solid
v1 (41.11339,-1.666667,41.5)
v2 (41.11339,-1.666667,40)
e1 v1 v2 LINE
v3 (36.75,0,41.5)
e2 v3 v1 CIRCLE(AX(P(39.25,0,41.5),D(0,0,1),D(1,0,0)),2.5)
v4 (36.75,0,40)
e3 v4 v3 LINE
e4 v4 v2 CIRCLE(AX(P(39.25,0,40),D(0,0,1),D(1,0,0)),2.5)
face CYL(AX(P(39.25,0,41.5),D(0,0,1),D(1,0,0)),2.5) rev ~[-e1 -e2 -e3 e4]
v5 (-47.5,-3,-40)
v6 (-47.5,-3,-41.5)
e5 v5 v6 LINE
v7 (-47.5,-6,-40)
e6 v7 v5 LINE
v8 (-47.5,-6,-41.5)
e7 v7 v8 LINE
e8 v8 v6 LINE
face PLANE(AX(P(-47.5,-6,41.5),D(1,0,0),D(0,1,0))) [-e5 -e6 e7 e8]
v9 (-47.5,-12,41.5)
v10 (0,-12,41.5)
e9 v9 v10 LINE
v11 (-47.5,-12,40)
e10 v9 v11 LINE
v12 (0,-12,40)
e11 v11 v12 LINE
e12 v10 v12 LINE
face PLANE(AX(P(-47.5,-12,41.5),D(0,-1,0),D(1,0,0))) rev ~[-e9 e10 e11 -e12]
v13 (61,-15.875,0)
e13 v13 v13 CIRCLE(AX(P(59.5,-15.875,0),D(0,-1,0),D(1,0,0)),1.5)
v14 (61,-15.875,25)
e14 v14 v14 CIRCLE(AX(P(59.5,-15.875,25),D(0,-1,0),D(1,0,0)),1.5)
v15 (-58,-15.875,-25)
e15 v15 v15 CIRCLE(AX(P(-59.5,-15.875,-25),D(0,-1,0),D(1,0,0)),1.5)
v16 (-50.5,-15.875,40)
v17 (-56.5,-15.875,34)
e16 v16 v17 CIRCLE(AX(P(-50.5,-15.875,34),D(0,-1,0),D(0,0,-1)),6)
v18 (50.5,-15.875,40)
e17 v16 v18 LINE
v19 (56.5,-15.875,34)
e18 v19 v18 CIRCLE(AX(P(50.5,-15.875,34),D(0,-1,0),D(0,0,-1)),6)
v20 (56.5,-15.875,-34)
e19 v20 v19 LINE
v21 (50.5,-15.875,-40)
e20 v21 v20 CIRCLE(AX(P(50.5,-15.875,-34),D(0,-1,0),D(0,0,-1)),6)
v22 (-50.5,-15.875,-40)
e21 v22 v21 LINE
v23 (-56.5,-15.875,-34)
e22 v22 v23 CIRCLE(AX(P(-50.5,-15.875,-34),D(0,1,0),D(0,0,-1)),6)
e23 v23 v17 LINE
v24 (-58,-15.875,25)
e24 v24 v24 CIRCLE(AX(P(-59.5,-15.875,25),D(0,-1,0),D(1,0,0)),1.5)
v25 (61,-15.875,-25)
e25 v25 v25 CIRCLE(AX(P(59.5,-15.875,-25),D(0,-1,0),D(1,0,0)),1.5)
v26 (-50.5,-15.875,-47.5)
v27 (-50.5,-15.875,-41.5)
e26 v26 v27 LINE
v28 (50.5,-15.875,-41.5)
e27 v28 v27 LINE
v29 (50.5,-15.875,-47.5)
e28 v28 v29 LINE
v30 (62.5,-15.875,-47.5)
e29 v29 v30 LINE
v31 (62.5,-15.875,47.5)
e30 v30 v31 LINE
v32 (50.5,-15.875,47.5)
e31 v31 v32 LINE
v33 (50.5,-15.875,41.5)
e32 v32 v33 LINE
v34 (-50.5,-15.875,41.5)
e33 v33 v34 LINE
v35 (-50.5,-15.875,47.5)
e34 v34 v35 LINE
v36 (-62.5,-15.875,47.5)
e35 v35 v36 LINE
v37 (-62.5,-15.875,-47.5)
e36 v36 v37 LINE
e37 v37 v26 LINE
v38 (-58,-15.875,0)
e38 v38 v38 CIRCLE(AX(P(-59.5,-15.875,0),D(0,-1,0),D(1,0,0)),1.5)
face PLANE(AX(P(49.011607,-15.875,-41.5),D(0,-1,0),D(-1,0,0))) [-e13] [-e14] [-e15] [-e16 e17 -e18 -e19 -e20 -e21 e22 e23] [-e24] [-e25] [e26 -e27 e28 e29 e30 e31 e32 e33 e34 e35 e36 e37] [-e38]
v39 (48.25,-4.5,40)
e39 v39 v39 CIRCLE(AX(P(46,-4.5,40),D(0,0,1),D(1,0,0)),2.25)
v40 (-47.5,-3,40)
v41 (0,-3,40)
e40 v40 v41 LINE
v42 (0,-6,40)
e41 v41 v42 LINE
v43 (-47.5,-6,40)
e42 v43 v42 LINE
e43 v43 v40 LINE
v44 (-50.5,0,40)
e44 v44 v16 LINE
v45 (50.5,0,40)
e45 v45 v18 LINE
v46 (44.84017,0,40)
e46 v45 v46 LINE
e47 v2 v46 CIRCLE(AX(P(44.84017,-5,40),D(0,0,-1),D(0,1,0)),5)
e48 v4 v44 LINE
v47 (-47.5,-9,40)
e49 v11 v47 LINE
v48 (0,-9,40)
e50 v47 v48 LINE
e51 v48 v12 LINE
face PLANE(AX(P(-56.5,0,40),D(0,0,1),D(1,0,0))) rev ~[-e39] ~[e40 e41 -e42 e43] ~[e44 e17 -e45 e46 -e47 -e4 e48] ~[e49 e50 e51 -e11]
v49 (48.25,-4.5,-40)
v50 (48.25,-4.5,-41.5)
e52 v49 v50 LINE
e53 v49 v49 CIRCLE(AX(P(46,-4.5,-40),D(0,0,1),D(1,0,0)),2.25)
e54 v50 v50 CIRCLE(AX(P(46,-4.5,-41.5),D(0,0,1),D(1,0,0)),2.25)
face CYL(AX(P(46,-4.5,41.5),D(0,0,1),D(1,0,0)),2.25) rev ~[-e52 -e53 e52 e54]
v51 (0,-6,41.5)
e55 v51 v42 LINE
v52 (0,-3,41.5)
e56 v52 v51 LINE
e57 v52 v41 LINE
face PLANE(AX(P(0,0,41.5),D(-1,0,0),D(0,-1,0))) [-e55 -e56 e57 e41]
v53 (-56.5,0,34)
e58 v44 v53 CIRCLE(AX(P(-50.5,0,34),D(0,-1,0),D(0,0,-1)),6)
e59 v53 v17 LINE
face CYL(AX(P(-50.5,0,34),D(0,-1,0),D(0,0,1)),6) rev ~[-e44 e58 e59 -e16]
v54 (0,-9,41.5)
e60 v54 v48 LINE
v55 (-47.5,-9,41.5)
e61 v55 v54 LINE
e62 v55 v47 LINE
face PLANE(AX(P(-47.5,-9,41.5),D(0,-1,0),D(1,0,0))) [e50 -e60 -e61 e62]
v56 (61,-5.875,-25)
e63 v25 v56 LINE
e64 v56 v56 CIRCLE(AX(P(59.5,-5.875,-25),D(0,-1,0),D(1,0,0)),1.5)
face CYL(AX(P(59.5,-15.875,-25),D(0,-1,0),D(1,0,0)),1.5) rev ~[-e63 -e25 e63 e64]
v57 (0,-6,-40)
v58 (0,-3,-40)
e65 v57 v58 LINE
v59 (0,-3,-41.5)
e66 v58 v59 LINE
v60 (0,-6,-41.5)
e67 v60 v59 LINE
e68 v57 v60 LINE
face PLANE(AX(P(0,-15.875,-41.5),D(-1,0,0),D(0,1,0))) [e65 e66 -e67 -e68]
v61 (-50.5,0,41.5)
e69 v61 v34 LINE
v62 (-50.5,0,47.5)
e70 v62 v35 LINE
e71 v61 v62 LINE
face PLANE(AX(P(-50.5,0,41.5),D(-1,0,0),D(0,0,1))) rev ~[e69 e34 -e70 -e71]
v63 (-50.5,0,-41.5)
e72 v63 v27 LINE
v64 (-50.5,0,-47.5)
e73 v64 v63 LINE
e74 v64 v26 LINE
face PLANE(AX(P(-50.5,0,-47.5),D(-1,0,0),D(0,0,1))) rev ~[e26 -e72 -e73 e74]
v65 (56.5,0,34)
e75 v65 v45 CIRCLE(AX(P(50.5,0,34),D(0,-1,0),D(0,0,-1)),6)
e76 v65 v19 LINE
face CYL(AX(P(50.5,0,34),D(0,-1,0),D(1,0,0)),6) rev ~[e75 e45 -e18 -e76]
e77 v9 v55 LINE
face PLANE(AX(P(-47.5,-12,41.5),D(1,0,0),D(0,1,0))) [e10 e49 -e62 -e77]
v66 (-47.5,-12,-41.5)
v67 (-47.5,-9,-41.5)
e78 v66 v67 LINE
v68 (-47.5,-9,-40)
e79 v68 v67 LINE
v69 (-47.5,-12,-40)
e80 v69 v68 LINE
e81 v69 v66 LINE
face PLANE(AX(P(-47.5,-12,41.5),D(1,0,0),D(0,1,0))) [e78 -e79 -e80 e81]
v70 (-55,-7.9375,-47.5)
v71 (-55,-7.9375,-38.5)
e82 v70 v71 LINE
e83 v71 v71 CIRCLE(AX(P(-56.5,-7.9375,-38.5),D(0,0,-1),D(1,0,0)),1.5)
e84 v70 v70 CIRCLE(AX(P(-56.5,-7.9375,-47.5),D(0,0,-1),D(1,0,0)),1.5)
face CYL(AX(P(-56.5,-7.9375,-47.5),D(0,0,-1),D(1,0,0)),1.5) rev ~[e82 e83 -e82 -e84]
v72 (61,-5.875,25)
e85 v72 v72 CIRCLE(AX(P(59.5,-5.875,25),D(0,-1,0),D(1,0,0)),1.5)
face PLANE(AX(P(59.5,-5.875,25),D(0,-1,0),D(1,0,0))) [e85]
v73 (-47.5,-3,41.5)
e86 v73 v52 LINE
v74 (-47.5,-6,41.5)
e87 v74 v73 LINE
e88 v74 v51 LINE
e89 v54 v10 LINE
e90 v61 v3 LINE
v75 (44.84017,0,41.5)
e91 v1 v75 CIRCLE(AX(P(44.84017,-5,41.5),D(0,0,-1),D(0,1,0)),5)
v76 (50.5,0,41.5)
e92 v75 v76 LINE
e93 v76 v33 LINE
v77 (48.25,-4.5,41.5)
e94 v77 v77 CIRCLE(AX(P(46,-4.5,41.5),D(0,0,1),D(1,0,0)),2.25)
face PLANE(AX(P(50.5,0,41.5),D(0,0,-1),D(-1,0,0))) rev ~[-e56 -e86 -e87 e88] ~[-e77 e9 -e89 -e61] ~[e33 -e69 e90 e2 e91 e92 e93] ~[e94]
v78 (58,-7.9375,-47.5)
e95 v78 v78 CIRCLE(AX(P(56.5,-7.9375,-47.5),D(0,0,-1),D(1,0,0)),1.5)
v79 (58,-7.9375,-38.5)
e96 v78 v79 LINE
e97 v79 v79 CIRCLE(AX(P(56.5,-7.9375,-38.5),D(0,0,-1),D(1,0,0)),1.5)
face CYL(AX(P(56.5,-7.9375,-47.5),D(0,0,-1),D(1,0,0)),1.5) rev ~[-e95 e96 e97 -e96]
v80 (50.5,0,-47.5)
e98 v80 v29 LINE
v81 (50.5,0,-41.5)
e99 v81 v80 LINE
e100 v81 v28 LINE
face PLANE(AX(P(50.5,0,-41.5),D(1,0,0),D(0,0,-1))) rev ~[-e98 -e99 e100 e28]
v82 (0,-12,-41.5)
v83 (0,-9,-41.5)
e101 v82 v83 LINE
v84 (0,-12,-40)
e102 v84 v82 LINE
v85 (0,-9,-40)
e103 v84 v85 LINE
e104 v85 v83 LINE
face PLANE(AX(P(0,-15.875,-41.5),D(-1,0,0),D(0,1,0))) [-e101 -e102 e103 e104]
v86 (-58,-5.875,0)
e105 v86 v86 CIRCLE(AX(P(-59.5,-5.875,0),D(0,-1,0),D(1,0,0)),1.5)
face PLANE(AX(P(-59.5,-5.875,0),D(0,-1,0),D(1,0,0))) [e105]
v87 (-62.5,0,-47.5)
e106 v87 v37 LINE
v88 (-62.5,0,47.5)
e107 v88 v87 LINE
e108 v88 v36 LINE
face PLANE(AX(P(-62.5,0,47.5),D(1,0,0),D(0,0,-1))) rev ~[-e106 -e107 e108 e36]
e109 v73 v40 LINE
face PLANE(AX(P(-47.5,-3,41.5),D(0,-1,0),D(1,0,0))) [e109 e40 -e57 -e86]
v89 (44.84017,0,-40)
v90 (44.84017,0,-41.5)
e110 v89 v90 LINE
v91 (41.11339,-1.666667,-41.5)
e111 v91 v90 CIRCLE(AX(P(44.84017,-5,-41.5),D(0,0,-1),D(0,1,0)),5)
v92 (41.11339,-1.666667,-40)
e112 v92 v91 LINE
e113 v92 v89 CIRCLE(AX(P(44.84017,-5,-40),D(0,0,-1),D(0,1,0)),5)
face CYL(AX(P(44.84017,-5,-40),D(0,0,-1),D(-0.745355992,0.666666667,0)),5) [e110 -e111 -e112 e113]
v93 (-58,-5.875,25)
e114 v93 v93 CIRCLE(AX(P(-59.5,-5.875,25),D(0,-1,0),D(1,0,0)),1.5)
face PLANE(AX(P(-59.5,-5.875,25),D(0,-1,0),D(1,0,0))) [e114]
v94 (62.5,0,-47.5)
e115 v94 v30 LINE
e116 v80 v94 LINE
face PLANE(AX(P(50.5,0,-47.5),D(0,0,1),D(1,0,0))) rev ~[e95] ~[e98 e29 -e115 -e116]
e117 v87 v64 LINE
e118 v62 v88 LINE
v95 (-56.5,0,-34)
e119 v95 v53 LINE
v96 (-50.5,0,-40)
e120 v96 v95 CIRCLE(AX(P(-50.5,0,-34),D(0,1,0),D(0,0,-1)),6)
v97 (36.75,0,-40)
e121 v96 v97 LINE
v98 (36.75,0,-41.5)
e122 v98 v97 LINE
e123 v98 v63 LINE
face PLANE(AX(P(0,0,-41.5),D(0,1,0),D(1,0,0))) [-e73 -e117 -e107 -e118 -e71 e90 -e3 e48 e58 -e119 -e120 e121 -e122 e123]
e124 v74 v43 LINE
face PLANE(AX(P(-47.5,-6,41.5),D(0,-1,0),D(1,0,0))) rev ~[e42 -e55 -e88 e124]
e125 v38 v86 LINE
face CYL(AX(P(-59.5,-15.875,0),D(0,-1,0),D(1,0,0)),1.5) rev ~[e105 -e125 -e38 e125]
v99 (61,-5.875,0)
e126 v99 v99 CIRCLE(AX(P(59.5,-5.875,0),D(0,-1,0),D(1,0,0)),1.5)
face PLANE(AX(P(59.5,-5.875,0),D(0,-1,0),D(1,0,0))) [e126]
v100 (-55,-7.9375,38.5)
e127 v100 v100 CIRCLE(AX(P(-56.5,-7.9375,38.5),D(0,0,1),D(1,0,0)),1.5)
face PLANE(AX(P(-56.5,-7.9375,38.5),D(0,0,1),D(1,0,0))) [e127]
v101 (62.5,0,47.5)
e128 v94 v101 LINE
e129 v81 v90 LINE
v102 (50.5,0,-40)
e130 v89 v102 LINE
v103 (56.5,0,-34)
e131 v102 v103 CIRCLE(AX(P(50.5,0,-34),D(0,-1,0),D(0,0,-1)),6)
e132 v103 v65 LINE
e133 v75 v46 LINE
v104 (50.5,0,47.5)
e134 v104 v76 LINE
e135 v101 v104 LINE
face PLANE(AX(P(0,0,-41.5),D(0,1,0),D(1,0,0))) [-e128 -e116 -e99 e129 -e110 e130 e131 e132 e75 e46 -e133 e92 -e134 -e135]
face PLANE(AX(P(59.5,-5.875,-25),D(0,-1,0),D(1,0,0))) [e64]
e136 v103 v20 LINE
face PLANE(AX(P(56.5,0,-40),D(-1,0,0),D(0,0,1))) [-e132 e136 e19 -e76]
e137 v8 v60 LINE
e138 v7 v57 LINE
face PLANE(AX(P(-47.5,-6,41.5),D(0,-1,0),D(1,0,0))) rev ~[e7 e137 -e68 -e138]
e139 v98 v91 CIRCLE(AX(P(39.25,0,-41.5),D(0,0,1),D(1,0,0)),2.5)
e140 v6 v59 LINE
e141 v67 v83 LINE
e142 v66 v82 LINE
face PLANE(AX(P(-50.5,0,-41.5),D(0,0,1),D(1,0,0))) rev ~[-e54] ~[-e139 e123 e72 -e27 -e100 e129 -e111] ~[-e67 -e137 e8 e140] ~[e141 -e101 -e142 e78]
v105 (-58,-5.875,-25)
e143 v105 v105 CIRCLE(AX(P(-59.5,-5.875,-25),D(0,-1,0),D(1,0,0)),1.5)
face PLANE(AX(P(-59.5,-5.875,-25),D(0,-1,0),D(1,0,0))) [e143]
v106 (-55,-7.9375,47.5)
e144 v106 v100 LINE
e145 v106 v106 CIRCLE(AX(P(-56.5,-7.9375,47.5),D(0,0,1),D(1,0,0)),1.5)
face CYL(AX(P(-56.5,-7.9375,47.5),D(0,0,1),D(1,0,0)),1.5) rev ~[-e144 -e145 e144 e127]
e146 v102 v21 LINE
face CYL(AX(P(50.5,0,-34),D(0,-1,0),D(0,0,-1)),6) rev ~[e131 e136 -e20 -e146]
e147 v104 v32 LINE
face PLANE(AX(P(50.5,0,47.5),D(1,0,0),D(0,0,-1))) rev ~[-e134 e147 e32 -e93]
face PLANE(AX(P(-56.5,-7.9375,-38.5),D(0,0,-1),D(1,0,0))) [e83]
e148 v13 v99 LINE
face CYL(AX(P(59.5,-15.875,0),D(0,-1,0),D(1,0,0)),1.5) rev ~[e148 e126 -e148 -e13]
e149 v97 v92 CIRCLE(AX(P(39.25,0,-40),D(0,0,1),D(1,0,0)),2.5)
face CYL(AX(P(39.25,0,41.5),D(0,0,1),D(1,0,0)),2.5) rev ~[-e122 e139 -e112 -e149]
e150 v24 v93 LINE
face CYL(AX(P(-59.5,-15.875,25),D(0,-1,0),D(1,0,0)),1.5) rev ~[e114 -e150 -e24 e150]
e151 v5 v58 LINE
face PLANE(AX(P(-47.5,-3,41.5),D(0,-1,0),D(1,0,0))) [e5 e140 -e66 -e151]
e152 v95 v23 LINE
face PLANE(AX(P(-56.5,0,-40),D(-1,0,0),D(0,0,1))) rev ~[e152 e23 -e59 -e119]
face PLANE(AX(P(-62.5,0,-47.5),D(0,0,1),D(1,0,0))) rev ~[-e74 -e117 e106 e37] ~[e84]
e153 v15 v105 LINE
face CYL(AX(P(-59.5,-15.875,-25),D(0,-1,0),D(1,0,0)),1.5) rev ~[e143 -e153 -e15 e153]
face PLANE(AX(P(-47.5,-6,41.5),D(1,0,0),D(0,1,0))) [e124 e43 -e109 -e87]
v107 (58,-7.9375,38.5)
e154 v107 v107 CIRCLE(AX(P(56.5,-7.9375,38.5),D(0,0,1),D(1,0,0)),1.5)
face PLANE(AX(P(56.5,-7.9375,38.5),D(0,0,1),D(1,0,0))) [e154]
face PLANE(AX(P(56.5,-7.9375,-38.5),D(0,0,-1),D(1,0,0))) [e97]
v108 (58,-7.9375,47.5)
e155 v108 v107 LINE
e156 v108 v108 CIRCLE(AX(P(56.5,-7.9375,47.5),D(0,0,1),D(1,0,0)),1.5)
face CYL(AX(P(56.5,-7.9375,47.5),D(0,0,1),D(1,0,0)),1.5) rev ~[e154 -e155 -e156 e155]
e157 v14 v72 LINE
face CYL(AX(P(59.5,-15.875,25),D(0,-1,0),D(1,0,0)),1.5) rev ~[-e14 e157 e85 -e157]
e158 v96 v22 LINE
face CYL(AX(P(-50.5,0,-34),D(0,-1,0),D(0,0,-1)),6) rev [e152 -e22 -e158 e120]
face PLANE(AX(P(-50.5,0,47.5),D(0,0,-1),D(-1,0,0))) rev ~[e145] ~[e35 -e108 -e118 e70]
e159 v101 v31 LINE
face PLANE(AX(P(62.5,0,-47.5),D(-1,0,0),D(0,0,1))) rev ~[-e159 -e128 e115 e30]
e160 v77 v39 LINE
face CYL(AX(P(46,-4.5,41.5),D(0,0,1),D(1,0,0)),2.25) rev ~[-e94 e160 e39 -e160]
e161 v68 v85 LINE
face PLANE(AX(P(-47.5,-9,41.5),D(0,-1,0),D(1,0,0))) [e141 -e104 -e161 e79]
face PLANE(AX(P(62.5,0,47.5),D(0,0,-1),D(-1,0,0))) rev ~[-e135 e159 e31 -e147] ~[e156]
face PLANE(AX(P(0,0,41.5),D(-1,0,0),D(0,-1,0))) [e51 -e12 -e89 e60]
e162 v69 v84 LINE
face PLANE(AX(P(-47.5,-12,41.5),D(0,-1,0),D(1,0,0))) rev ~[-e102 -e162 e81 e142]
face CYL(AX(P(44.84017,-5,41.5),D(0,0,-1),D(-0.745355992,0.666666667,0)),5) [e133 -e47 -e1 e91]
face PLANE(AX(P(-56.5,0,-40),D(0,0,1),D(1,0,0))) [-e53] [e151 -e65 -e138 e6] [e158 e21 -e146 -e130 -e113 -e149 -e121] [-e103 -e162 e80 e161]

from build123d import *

# Parameters (mm, degrees)
F0_W      = 113
F0_H      = 80
F1_DEPTH  = 15.875
F2_R      = 6
F3_W      = 89
F3_H      = 3
F3_W_2    = 95
F3_R      = 1.5
F4_DEPTH  = 132
F5_R      = 1.5
F6_DEPTH  = 10
F7_W      = 42.9403819144
F7_H      = 7.4070980772
F8_DEPTH  = 1.5
F9_W      = 42.8083911538
F9_H      = 7.2430414148
F10_DEPTH = 1.5
F11_R     = 2.5
F12_DEPTH = 92
F13_R     = 2.25
F14_DEPTH = 200
F15_R     = 5
F16_R     = 1.5
F17_DEPTH = 9
F18_R     = 1.5
F19_DEPTH = 9
F20_R     = 1.5
F21_DEPTH = 9
F22_R     = 1.5
F23_DEPTH = 9


with BuildPart() as f1:
    # F0 (on Front) → F1 (new body)
    with BuildSketch(Plane.XZ):
        Polygon((-50.5, 47.5), (-62.5, 47.5), (-62.5, -47.5), (-50.5, -47.5), (-50.5, -41.5), (50.5, -41.5), (50.5, -47.5), (62.5, -47.5), (62.5, 47.5), (50.5, 47.5), (50.5, 41.5), (-50.5, 41.5), align=None)
        Rectangle(F0_W, F0_H, mode=Mode.SUBTRACT)
    extrude(amount=F1_DEPTH)

    # F2
    f2_edges = [f1.edges().sort_by_distance(p)[0] for p in [
        (56.5, -7.9375, 40),
        (56.5, -7.9375, -40),
        (-56.5, -7.9375, -40),
        (-56.5, -7.9375, 40),
    ]]
    fillet(f2_edges, radius=F2_R)

    # F3 (on face) → F4 (cut)
    with BuildSketch(Plane.XY.offset(41.5)):
        with Locations((-3, -4.5)):
            Rectangle(F3_W, F3_H)
        with Locations((0, -10.5)):
            Rectangle(F3_W_2, F3_H)
        with Locations((46, -4.5)):
            Circle(F3_R)
    extrude(amount=-F4_DEPTH, mode=Mode.SUBTRACT)

    # F5 (on face) → F6 (cut)
    with BuildSketch(Plane.XZ.offset(15.875)):
        with Locations((-59.5, 0)):
            Circle(F5_R)
        with Locations((59.5, 0)):
            Circle(F5_R)
        with Locations((59.5, -25)):
            Circle(F5_R)
        with Locations((59.5, 25)):
            Circle(F5_R)
        with Locations((-59.5, 25)):
            Circle(F5_R)
        with Locations((-59.5, -25)):
            Circle(F5_R)
    extrude(amount=-F6_DEPTH, mode=Mode.SUBTRACT)

    # F7 (on face) → F8 (join)
    with BuildSketch(Plane.XY.offset(41.5)):
        with Locations((21.4701909572, -3.7035490386)):
            Rectangle(F7_W, F7_H)
        Polygon((42.9403819144, -7.4070980772), (0, -7.4070980772), (0, -14.1382440925), (49.1435937583, -14.1382440925), (49.1435937583, -7.4070980772), align=None)
    extrude(amount=-F8_DEPTH)

    # F9 (on face) → F10 (join)
    with BuildSketch(Plane(origin=(0, 0, -41.5), x_dir=(1, 0, 0), z_dir=(0, 0, -1))):
        Polygon((49.0116067231, 15.875), (0, 15.875), (0, 7.2430414148), (42.8083911538, 7.2430414148), (49.0116067231, 7.2430414148), align=None)
        with Locations((21.4041955769, 3.6215207074)):
            Rectangle(F9_W, F9_H)
    extrude(amount=-F10_DEPTH)

    # F11 (on face) → F12 (cut)
    with BuildSketch(Plane.XY.offset(41.5)):
        with Locations((39.25, 0)):
            Circle(F11_R)
    extrude(amount=-F12_DEPTH, mode=Mode.SUBTRACT)

    # F13 (on face) → F14 (cut)
    with BuildSketch(Plane.XY.offset(41.5)):
        with Locations((46, -4.5)):
            Circle(F13_R)
    extrude(amount=-F14_DEPTH, mode=Mode.SUBTRACT)

    # F15
    f15_edges = [f1.edges().sort_by_distance(p)[0] for p in [
        (41.75, 0, 40.75),
        (41.75, 0, -40.75),
    ]]
    fillet(f15_edges, radius=F15_R)

    # F16 (on face) → F17 (cut)
    with BuildSketch(Plane.XY.offset(47.5)):
        with Locations((-56.5, -7.9375)):
            Circle(F16_R)
    extrude(amount=-F17_DEPTH, mode=Mode.SUBTRACT)

    # F18 (on face) → F19 (cut)
    with BuildSketch(Plane.XY.offset(47.5)):
        with Locations((56.5, -7.9375)):
            Circle(F18_R)
    extrude(amount=-F19_DEPTH, mode=Mode.SUBTRACT)

    # F20 (on face) → F21 (cut)
    with BuildSketch(Plane(origin=(0, 0, -47.5), x_dir=(1, 0, 0), z_dir=(0, 0, -1))):
        with Locations((-56.5, 7.9375)):
            Circle(F20_R)
    extrude(amount=-F21_DEPTH, mode=Mode.SUBTRACT)

    # F22 (on face) → F23 (cut)
    with BuildSketch(Plane(origin=(0, 0, -47.5), x_dir=(1, 0, 0), z_dir=(0, 0, -1))):
        with Locations((56.5, 7.9375)):
            Circle(F22_R)
    extrude(amount=-F23_DEPTH, mode=Mode.SUBTRACT)


solid = f1.part
